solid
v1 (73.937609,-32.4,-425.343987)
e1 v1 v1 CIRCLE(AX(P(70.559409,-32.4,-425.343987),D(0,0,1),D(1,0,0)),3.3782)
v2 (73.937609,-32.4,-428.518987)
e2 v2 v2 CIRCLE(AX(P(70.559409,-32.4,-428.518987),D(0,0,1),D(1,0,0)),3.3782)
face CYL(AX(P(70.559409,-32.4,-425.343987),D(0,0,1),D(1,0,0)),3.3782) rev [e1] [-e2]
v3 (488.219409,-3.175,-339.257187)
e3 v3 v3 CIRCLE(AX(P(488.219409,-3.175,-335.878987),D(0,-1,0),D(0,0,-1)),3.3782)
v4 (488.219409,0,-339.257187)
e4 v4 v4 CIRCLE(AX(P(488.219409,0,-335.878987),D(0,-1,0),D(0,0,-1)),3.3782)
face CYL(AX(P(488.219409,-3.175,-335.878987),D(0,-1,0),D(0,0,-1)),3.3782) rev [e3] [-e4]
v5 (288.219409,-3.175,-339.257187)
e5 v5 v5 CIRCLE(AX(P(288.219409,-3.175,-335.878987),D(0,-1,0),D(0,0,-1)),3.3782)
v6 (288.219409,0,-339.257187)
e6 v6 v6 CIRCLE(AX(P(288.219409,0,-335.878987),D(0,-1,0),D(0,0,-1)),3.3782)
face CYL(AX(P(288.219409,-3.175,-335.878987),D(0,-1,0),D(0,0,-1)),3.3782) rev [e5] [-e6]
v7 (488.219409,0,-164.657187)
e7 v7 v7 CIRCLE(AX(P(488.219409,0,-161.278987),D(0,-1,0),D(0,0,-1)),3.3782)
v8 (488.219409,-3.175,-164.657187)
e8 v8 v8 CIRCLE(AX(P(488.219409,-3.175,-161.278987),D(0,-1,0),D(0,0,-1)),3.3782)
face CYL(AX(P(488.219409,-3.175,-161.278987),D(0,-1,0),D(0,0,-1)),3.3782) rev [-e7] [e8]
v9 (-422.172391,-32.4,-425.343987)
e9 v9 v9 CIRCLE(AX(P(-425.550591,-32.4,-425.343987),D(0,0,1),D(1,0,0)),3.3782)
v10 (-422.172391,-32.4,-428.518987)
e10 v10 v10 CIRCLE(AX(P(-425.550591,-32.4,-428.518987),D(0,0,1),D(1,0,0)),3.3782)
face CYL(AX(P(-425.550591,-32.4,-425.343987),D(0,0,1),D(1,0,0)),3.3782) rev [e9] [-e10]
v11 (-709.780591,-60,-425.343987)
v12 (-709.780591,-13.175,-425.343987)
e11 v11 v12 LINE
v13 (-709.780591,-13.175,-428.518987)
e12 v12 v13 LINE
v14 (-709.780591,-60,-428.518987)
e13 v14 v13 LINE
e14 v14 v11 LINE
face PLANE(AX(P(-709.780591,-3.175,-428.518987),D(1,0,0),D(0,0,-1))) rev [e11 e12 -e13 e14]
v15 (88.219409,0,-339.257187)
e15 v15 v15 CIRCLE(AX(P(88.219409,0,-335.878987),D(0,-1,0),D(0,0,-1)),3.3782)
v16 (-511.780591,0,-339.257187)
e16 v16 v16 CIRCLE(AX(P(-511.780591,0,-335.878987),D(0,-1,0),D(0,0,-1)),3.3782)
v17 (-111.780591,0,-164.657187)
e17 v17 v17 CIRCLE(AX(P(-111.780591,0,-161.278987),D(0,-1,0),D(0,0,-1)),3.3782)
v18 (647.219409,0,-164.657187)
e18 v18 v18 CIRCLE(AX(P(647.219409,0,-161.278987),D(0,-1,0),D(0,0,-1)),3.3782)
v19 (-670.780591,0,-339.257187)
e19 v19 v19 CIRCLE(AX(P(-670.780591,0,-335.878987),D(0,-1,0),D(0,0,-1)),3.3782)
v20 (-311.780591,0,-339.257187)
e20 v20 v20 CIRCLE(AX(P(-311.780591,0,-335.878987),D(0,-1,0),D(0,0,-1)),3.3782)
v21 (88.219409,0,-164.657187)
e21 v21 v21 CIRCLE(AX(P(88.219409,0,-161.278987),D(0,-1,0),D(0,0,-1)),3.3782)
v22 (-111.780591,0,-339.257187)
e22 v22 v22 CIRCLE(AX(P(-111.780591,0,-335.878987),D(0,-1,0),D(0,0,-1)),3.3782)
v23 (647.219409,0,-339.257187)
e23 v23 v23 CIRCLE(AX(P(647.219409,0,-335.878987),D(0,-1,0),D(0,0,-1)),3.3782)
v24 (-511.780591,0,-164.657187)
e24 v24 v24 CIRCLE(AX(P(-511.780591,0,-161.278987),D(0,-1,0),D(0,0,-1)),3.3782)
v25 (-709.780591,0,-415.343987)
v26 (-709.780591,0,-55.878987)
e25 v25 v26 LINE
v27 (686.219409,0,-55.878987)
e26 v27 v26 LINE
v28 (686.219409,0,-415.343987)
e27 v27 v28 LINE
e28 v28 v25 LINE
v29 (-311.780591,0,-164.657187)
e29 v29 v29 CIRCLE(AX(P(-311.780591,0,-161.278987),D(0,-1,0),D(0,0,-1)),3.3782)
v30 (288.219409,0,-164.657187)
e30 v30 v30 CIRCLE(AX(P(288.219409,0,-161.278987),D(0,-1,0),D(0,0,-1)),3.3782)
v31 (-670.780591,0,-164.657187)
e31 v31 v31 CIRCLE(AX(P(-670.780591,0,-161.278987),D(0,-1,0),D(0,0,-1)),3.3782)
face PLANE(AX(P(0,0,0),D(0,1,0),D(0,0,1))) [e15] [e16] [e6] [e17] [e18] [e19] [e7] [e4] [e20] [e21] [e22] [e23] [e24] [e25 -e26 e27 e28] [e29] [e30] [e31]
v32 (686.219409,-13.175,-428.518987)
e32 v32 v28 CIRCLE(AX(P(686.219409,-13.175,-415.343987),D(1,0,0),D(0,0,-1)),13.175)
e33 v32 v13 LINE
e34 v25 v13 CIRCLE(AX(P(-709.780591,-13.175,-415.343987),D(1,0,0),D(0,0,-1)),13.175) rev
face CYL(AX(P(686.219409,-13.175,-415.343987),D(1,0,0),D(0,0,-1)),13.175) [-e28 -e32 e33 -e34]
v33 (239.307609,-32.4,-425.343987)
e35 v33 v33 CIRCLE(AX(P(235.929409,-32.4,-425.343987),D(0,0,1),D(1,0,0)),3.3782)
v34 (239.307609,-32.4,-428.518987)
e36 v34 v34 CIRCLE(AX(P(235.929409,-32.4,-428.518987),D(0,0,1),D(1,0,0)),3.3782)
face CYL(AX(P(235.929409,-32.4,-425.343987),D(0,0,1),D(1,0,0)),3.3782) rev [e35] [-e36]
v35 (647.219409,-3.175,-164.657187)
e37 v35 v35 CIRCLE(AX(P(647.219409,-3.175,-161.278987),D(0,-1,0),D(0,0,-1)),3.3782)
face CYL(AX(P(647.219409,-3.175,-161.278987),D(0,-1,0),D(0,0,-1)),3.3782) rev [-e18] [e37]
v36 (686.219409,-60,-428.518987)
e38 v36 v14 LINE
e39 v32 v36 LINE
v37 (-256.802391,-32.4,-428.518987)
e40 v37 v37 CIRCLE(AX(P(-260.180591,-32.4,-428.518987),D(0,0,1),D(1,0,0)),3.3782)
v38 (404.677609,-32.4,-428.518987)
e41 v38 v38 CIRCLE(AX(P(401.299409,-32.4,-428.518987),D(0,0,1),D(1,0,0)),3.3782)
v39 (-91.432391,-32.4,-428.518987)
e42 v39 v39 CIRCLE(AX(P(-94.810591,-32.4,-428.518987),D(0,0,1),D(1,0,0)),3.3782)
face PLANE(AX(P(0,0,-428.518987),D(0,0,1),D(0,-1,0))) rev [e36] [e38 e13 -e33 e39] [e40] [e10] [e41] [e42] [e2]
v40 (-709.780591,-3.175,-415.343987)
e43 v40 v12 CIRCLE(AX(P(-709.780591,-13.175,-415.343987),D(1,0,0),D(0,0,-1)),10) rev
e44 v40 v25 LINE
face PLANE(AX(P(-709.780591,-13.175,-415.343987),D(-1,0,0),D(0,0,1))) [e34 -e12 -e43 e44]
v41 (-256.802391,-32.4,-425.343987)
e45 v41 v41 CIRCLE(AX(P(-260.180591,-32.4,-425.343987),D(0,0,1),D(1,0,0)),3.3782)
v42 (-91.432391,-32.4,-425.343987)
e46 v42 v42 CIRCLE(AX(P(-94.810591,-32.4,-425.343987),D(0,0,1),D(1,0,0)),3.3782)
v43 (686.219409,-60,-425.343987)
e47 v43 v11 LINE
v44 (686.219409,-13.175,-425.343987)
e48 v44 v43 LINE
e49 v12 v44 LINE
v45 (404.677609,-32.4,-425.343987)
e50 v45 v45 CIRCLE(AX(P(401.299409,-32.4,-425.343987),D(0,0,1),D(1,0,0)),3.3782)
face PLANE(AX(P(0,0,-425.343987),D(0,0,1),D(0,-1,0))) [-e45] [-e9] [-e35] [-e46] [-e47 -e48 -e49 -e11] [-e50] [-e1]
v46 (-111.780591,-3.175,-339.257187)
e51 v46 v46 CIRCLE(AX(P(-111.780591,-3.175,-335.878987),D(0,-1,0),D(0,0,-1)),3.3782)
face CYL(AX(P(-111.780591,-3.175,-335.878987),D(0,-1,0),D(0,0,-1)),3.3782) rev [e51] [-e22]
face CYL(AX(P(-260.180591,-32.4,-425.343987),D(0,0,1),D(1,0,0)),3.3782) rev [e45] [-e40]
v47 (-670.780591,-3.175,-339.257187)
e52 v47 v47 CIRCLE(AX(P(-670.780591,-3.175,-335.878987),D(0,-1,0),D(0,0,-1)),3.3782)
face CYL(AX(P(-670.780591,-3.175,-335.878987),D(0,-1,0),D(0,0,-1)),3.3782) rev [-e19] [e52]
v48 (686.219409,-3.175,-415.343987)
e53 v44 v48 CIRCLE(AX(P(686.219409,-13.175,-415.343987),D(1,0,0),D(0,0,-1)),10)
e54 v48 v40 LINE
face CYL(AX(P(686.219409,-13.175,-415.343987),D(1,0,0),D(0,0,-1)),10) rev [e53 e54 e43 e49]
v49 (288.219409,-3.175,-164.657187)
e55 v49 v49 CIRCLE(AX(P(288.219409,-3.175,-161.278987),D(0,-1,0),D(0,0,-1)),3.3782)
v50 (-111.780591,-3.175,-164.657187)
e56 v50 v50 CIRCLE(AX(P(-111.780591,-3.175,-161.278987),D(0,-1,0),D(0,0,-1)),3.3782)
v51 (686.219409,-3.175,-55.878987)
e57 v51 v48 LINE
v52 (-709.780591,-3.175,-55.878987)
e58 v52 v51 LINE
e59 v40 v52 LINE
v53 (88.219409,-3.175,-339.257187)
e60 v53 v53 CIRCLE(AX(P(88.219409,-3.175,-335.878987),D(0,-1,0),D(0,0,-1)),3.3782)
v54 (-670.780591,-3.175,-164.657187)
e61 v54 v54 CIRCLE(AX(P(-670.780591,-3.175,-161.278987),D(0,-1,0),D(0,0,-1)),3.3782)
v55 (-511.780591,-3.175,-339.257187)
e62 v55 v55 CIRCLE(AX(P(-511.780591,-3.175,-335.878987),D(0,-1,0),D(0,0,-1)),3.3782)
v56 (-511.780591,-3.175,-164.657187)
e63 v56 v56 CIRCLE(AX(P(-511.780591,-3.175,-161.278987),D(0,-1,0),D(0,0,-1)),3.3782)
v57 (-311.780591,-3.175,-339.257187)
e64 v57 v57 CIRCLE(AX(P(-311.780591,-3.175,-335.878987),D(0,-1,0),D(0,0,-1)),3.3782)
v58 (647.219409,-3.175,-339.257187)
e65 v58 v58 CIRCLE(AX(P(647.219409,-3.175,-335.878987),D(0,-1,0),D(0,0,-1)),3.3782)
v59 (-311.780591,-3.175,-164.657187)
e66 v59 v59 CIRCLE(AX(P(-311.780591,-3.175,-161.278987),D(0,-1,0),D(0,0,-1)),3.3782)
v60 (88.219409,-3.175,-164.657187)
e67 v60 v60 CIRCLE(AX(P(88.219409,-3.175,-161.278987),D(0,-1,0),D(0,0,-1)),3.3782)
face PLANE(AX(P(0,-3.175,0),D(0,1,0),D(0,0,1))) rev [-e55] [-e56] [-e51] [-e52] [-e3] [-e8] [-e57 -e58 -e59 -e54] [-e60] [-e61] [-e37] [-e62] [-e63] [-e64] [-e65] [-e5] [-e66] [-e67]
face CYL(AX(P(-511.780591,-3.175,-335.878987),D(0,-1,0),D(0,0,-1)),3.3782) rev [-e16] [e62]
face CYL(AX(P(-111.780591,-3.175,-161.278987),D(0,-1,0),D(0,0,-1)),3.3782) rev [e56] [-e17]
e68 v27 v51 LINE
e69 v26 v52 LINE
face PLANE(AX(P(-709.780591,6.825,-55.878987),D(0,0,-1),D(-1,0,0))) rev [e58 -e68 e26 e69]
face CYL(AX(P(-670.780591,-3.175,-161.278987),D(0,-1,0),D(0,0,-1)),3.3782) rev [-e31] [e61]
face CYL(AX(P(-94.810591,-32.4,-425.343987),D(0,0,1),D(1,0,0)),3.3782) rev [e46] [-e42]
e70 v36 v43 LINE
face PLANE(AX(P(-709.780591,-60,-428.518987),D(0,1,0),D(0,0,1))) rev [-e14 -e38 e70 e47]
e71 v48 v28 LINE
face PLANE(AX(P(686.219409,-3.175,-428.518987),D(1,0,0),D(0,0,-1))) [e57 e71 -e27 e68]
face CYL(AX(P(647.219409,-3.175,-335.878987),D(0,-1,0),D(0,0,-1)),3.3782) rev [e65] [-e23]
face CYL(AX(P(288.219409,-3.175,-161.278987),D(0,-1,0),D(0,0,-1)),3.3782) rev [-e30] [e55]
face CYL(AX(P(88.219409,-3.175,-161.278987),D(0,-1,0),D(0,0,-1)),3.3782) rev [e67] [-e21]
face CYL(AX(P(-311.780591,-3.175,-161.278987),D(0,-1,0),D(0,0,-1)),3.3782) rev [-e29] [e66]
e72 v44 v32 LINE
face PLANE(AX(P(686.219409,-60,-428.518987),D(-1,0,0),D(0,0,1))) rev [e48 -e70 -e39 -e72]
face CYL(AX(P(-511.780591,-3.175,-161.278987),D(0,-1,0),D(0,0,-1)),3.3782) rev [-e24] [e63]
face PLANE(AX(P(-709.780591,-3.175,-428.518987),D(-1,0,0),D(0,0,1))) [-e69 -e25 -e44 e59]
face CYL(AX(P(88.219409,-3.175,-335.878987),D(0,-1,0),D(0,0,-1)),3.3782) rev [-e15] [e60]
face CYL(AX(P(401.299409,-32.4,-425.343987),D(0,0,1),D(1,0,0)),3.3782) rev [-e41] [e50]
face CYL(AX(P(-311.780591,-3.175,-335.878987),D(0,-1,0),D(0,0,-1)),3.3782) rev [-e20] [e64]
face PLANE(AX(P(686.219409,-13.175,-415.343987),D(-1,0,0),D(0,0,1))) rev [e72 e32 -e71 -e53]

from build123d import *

# Parameters (mm, degrees)
CROQUIS1_W                       = 1396
CROQUIS1_H                       = 392.64
BRIDA_BASE1_DEPTH                = 3.175
TALADRO_DE_MARGEN_PARA_1_41_D    = 6.7564
BRIDA_DE_ARISTA1_STRIP_W         = 32.7
BRIDA_DE_ARISTA1_STRIP_H         = 3.175
BRIDA_DE_ARISTA1_STRIP_CUT_DEPTH = 1396
BRIDA_DE_ARISTA1_DEPTH           = 1396
TALADRO_DE_MARGEN_PARA_1_42_D    = 6.7564
CROQUIS9_W                       = 1396
CROQUIS9_H                       = 20
CORTAR_EXTRUIR1_DEPTH            = 10


# Sheet-metal steps are written as plain solids
with BuildPart() as part:
    # Croquis1 → Brida base1 (new body)
    with BuildSketch(Plane(origin=(0, 0, 0), x_dir=(1, 0, 0), z_dir=(0, 1, 0))):
        with Locations((-11.780590717, 232.198987342)):
            Rectangle(CROQUIS1_W, CROQUIS1_H)
    extrude(amount=-BRIDA_BASE1_DEPTH)

    # Taladro de margen para 1/41 (through all)
    with Locations(Plane(origin=(0, -3.175, 0), x_dir=(-1, 0, 0), z_dir=(0, -1, 0))):
        with Locations((511.780590717, 161.278987342), (511.780590717, 335.878987342), (311.780590717, 161.278987342), (311.780590717, 335.878987342), (111.780590717, 161.278987342), (111.780590717, 335.878987342), (-88.219409283, 161.278987342), (-88.219409283, 335.878987342), (-288.219409283, 161.278987342), (-288.219409283, 335.878987342), (-488.219409283, 161.278987342), (-488.219409283, 335.878987342), (670.780590717, 161.278987342), (670.780590717, 335.878987342), (-647.219409283, 161.278987342), (-647.219409283, 335.878987342)):
            Hole(TALADRO_DE_MARGEN_PARA_1_41_D / 2)

    # Brida de arista1 strip (across the edge) → Brida de arista1 strip cut (cut)
    with BuildSketch(Plane(origin=(-709.780590717, -3.175, -428.518987342), x_dir=(0, 0, 1), z_dir=(1, 0, 0))):
        with Locations((-3.175, -1.5875)):
            Rectangle(BRIDA_DE_ARISTA1_STRIP_W, BRIDA_DE_ARISTA1_STRIP_H)
    extrude(amount=BRIDA_DE_ARISTA1_STRIP_CUT_DEPTH, mode=Mode.SUBTRACT)

    # Brida de arista1 section (across the edge) → Brida de arista1 (add)
    with BuildSketch(Plane(origin=(-709.780590717, -3.175, -428.518987342), x_dir=(0, 0, 1), z_dir=(1, 0, 0))):
        with BuildLine():
            Line((0, 10), (0, 56.825))
            Line((0, 56.825), (3.175, 56.825))
            Line((3.175, 56.825), (3.175, 10))
            ThreePointArc((3.175, 10), (6.103932188, 2.928932188), (13.175, 0))
            Line((13.175, 0), (13.175, -3.175))
            ThreePointArc((13.175, -3.175), (3.858868158, 0.683868158), (0, 10))
        make_face()
    extrude(amount=BRIDA_DE_ARISTA1_DEPTH)

    # Taladro de margen para 1/42 (through all)
    with Locations(Plane.XY.offset(-425.343987342)):
        with Locations((-425.550590717, -32.4), (-260.180590717, -32.4), (-94.810590717, -32.4), (70.559409283, -32.4), (235.929409283, -32.4), (401.299409283, -32.4)):
            Hole(TALADRO_DE_MARGEN_PARA_1_42_D / 2)

    # Croquis9 → Cortar-Extruir1 (cut)
    with BuildSketch(Plane(origin=(0, -3.175, 0), x_dir=(-1, 0, 0), z_dir=(0, -1, 0))):
        with Locations((11.780590717, 45.878987342)):
            Rectangle(CROQUIS9_W, CROQUIS9_H)
    extrude(amount=-CORTAR_EXTRUIR1_DEPTH, mode=Mode.SUBTRACT)


solid = part.part
